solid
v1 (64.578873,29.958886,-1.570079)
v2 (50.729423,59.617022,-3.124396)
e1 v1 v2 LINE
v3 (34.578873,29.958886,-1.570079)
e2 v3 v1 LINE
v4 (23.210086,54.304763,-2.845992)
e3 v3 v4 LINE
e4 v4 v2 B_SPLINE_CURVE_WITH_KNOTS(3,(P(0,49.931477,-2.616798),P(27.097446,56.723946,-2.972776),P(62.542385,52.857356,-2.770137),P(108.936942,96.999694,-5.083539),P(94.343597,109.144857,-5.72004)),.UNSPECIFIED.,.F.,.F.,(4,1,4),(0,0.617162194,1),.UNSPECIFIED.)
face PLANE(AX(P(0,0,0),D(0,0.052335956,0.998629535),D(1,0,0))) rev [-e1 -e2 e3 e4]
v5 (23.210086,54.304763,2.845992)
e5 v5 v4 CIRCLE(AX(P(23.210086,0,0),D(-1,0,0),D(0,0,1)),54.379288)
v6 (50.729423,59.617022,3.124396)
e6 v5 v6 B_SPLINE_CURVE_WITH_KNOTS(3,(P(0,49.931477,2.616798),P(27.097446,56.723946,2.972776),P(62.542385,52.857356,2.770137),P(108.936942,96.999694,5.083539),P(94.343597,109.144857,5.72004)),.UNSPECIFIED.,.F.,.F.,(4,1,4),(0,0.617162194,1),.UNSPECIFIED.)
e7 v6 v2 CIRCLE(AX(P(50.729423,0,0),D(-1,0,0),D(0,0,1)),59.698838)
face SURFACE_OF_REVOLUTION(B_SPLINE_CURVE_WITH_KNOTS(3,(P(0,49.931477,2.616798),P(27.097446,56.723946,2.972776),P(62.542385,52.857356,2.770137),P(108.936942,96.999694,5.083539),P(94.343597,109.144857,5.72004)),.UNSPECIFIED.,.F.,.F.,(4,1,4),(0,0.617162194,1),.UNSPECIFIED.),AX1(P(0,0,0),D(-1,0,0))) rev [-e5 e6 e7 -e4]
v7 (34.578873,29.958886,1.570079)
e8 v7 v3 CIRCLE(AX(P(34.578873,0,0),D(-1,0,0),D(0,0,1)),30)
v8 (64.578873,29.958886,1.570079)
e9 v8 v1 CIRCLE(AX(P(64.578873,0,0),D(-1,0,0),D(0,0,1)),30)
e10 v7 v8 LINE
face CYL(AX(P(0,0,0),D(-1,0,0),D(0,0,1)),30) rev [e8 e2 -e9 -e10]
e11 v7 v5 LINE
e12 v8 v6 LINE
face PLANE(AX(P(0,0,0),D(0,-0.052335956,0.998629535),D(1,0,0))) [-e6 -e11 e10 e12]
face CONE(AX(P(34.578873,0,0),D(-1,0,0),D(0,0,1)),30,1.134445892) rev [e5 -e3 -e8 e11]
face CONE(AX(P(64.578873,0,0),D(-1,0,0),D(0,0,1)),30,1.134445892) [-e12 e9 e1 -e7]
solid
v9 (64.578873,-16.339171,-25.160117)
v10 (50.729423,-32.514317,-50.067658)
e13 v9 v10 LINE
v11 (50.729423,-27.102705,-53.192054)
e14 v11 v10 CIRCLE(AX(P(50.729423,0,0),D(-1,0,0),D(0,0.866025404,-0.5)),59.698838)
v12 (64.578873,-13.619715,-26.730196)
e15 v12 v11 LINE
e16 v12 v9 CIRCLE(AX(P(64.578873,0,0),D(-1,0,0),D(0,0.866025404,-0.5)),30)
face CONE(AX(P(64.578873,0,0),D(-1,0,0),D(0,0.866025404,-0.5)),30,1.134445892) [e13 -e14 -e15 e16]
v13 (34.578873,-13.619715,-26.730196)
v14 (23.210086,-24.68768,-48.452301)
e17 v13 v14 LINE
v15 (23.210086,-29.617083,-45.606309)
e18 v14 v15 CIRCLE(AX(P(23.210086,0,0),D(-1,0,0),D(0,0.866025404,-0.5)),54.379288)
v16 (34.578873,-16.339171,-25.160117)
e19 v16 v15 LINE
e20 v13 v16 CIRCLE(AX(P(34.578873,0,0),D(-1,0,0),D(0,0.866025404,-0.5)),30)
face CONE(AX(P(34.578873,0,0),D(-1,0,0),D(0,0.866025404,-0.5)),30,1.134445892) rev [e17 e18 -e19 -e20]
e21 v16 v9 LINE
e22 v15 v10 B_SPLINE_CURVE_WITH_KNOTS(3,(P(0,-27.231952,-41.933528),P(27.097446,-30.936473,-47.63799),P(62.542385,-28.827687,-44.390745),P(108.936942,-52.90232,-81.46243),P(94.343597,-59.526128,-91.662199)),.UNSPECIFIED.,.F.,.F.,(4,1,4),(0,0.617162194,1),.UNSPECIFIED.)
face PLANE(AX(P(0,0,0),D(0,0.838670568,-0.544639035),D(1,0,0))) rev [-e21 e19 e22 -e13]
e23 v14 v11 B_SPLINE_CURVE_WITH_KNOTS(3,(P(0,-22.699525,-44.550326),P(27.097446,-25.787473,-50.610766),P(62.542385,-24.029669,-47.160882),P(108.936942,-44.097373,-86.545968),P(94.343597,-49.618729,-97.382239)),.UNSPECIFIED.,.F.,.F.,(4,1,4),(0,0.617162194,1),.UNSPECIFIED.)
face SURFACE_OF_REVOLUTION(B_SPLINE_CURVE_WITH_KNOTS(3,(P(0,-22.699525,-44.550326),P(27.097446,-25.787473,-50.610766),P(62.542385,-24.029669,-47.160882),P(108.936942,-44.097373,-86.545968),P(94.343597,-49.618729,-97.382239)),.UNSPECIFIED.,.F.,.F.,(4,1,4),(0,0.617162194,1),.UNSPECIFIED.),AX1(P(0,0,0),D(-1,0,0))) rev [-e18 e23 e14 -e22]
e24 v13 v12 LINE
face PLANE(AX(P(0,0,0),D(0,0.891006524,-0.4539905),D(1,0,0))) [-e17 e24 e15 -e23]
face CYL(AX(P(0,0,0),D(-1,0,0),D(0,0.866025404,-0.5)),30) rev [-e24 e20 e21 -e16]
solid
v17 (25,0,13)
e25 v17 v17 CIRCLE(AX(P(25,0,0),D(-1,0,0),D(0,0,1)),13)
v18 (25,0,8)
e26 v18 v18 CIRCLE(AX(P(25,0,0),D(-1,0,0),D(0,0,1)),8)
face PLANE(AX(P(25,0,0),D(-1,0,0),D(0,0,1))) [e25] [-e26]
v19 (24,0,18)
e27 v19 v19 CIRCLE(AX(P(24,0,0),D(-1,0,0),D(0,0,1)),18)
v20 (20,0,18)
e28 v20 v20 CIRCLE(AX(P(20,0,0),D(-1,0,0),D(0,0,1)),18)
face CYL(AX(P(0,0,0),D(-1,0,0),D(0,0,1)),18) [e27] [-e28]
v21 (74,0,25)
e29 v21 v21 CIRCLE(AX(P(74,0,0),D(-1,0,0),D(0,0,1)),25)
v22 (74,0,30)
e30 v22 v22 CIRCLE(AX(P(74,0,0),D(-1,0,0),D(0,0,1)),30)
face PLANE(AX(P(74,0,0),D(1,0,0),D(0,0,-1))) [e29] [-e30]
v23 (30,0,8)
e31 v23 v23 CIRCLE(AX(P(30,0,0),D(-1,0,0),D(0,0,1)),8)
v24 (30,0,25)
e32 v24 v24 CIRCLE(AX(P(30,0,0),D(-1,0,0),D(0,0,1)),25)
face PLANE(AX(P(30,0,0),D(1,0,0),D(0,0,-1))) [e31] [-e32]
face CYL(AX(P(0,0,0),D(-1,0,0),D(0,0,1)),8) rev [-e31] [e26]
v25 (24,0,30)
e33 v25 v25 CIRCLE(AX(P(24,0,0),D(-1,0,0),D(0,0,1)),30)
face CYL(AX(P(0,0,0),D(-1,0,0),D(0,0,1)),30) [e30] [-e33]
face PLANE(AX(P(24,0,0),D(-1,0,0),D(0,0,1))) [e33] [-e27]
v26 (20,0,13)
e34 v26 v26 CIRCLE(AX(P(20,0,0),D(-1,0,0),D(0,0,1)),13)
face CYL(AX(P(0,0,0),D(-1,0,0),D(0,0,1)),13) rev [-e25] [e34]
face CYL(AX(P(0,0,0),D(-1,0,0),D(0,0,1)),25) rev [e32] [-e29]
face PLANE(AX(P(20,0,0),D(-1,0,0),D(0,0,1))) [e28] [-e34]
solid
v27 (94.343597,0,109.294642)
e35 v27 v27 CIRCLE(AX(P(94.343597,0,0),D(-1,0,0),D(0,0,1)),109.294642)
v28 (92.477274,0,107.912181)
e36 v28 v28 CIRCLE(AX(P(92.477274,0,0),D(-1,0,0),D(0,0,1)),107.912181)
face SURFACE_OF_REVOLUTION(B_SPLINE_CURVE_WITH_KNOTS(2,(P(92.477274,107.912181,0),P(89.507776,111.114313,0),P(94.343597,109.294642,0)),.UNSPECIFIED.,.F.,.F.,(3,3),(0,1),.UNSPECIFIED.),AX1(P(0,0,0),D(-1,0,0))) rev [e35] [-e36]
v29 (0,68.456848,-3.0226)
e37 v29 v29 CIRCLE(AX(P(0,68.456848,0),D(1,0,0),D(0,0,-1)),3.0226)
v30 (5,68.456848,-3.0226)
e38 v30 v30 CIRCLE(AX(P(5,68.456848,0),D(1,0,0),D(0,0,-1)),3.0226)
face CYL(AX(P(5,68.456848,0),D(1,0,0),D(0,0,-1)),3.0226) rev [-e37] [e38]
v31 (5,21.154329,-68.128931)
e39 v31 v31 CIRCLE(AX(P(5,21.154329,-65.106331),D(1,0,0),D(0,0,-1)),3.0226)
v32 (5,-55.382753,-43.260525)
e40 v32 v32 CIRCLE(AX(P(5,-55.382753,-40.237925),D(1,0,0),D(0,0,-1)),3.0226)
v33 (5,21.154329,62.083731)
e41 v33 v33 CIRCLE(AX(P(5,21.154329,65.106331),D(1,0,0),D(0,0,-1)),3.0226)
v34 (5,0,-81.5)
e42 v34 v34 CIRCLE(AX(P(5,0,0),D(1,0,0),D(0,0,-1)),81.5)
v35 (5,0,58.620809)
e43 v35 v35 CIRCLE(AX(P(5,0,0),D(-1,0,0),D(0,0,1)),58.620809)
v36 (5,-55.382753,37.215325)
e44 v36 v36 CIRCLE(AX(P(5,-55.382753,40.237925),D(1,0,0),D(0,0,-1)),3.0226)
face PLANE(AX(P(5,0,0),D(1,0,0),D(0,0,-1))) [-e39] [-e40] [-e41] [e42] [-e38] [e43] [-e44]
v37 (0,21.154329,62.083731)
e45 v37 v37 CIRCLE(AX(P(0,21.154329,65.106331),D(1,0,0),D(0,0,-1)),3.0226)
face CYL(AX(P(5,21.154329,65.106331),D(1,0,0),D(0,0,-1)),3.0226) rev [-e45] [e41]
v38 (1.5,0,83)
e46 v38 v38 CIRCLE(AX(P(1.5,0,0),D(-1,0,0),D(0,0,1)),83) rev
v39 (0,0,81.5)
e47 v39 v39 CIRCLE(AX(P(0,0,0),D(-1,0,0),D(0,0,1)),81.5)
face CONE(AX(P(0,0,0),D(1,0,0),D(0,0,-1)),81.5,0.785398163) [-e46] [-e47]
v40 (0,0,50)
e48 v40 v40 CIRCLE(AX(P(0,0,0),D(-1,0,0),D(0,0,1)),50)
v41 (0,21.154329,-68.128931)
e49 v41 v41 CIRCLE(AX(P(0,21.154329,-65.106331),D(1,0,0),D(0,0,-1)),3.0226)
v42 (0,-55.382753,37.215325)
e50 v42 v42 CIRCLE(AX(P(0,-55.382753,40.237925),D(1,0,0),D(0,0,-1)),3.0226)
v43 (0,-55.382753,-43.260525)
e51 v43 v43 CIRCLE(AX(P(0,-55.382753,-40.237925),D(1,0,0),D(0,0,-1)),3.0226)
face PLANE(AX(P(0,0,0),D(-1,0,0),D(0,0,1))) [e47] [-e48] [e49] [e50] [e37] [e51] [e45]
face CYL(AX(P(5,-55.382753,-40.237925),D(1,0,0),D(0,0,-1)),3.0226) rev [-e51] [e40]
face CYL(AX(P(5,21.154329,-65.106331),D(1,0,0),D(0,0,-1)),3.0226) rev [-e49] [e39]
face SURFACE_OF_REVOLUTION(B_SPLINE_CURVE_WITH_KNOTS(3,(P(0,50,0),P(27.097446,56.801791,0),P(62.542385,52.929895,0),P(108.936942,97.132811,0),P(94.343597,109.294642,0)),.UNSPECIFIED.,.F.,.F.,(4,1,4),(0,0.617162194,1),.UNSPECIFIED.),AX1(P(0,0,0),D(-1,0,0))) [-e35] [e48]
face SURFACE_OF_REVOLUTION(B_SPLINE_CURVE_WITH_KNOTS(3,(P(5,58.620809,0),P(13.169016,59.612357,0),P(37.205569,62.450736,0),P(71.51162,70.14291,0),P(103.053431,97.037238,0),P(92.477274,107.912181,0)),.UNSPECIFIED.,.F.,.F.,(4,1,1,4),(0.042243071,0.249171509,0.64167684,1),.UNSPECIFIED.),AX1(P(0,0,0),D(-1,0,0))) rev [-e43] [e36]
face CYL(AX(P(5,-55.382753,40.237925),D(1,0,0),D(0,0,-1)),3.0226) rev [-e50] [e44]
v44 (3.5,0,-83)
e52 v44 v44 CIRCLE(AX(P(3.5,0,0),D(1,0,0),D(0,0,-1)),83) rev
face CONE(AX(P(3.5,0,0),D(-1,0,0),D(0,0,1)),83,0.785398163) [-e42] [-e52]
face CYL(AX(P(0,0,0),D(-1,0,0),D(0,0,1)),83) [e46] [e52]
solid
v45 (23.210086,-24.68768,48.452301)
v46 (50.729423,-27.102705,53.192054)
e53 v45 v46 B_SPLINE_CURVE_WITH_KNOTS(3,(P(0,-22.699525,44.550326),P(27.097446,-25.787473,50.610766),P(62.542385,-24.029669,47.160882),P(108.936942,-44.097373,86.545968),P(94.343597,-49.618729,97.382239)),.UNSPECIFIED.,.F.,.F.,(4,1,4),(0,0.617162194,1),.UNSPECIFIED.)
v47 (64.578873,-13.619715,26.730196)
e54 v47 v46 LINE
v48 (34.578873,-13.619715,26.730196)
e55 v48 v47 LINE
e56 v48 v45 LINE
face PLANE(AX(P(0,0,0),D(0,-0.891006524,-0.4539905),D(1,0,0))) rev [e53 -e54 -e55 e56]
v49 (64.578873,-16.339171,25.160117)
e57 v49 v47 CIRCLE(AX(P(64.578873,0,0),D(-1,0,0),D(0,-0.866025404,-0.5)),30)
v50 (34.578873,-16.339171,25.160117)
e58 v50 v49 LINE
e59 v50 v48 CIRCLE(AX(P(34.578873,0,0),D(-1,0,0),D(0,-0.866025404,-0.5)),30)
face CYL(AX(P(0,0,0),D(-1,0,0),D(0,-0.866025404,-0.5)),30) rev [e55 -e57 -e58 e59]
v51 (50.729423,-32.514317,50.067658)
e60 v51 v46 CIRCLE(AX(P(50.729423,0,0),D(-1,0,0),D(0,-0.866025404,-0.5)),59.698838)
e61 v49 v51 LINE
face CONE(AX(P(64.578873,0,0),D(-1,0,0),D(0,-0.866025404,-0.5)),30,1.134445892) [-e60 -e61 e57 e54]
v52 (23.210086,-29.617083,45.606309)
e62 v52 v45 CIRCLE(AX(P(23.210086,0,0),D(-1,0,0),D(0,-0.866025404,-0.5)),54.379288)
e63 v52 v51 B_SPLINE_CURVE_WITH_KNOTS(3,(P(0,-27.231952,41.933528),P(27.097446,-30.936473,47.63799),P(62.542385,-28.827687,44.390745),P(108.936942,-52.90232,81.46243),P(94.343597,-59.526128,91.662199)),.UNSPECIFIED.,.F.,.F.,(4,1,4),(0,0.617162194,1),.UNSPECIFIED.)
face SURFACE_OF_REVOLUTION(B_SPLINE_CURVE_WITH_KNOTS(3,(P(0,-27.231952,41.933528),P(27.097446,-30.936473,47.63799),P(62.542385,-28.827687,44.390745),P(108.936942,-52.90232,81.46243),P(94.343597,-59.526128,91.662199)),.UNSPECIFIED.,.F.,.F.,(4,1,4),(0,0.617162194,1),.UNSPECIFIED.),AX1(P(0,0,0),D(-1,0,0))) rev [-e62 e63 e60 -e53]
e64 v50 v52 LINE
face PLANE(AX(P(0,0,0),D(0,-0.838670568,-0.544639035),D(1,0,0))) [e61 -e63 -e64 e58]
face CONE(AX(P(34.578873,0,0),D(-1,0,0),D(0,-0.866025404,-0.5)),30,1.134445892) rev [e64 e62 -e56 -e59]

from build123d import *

# Parameters (mm, degrees)
REVOLVE2_ANGLE    = 6
CIRPATTERN2_COUNT = 3
CHAMFER1_SIZE     = 1.5
SKETCH4_W         = 3.0226
SKETCH4_H         = 5
CIRPATTERN4_COUNT = 5


# Read off the part's stored shape, not the designer's step: Revolve2
with BuildPart() as part:
    # Sketch1 → Revolve1 (revolve)
    with BuildSketch(Plane.XY, mode=Mode.PRIVATE) as revolve1_sk:
        with BuildLine():
            Line((0, 58), (0, 83))
            Line((0, 83), (5, 83))
            Line((5, 83), (5, 58.620808853))
            add(Edge.make_bspline(
                [(5, 58.620808853), (13.169016264, 59.612357006), (37.205568866, 62.450736308), (71.511619786, 70.14291029), (103.053430821, 97.037237569), (92.477274422, 107.912180597)],
                knots=[0.042243071, 0.042243071, 0.042243071, 0.042243071, 0.249171509, 0.64167684, 1, 1, 1, 1], degree=3))
            add(Edge.make_bspline(
                [(92.477274422, 107.912180597), (89.507775887, 111.114313016), (94.343596803, 109.29464162)],
                knots=[0, 0, 0, 1, 1, 1], degree=2))
            add(Edge.make_bspline(
                [(0, 50), (27.09744583, 56.801790812), (62.542385387, 52.929895036), (108.936942342, 97.132810829), (94.343596803, 109.29464162)],
                knots=[0, 0, 0, 0, 0.617162194, 1, 1, 1, 1], degree=3))
            Line((0, 50), (0, 58))
        make_face()
        Polygon((25, 8), (30, 8), (30, 25), (74, 25), (74, 30), (24, 30), (24, 18), (20, 18), (20, 13), (25, 13), align=None)
    revolve(revolve1_sk.sketch.rotate(Axis((0, 0, 0), (1, 0, 0)), 90), axis=Axis((0, 0, 0), (1, 0, 0)))

    # Chamfer1
    chamfer1_edges = [part.edges().sort_by_distance(p)[0] for p in [
        (0, 0, -83),
        (5, 0, -83),
    ]]
    chamfer(chamfer1_edges, length=CHAMFER1_SIZE)

    # Sketch4 → B (0.238) Diameter Hole1 (revolve, cut)
    with BuildSketch(Plane(origin=(5, 68.456847529, 0), x_dir=(0, 0, -1), z_dir=(0, 1, 0))):
        with Locations((1.5113, 2.5)):
            Rectangle(SKETCH4_W, SKETCH4_H)
    b_0_238_diameter_hole1 = revolve(axis=Axis((11.35, 68.456847529, 0), (-1, 0, 0)), mode=Mode.SUBTRACT)

    # CirPattern4: B (0.238) Diameter Hole1 ×5 about axis
    cirpattern4_axis = Axis((0, 0, 0), (1, 0, 0))
    for i in range(1, CIRPATTERN4_COUNT):
        add(b_0_238_diameter_hole1.rotate(cirpattern4_axis, i * 360 / CIRPATTERN4_COUNT), mode=Mode.SUBTRACT)


with BuildPart() as body_2:
    # Revolve2 outline → Revolve2 (revolve)
    with BuildSketch(Plane(origin=(0, 0, 0), x_dir=(0, 0.9986295347545738, -0.052335956242944064), z_dir=(0, -0.052335956242944064, -0.9986295347545738))):
        with BuildLine():
            add(Edge.make_bspline(
                [(54.3792884, 23.210086414), (55.796873577, 32.557419826), (57.079838653, 41.563111058), (59.698837568, 50.729422534)],
                knots=[0.184972593, 0.184972593, 0.184972593, 0.184972593, 0.417484467, 0.417484467, 0.417484467, 0.417484467], degree=3))
            Line((59.698837568, 50.729422534), (30, 64.578873173))
            Line((30, 64.578873173), (30, 34.578873173))
            Line((30, 34.578873173), (54.3792884, 23.210086414))
        make_face()
    revolve(axis=Axis((0, 0, 0), (1, 0, 0)), revolution_arc=REVOLVE2_ANGLE)


with BuildPart() as cirpattern2_1:
    # CirPattern2: pattern copy
    add(body_2.part.rotate(Axis((0, 0, 0), (1, 0, 0)), 1 * 360 / CIRPATTERN2_COUNT))


with BuildPart() as cirpattern2_2:
    # CirPattern2: pattern copy
    add(body_2.part.rotate(Axis((0, 0, 0), (1, 0, 0)), 2 * 360 / CIRPATTERN2_COUNT))


solid = Compound([part.part, body_2.part, cirpattern2_1.part, cirpattern2_2.part])
